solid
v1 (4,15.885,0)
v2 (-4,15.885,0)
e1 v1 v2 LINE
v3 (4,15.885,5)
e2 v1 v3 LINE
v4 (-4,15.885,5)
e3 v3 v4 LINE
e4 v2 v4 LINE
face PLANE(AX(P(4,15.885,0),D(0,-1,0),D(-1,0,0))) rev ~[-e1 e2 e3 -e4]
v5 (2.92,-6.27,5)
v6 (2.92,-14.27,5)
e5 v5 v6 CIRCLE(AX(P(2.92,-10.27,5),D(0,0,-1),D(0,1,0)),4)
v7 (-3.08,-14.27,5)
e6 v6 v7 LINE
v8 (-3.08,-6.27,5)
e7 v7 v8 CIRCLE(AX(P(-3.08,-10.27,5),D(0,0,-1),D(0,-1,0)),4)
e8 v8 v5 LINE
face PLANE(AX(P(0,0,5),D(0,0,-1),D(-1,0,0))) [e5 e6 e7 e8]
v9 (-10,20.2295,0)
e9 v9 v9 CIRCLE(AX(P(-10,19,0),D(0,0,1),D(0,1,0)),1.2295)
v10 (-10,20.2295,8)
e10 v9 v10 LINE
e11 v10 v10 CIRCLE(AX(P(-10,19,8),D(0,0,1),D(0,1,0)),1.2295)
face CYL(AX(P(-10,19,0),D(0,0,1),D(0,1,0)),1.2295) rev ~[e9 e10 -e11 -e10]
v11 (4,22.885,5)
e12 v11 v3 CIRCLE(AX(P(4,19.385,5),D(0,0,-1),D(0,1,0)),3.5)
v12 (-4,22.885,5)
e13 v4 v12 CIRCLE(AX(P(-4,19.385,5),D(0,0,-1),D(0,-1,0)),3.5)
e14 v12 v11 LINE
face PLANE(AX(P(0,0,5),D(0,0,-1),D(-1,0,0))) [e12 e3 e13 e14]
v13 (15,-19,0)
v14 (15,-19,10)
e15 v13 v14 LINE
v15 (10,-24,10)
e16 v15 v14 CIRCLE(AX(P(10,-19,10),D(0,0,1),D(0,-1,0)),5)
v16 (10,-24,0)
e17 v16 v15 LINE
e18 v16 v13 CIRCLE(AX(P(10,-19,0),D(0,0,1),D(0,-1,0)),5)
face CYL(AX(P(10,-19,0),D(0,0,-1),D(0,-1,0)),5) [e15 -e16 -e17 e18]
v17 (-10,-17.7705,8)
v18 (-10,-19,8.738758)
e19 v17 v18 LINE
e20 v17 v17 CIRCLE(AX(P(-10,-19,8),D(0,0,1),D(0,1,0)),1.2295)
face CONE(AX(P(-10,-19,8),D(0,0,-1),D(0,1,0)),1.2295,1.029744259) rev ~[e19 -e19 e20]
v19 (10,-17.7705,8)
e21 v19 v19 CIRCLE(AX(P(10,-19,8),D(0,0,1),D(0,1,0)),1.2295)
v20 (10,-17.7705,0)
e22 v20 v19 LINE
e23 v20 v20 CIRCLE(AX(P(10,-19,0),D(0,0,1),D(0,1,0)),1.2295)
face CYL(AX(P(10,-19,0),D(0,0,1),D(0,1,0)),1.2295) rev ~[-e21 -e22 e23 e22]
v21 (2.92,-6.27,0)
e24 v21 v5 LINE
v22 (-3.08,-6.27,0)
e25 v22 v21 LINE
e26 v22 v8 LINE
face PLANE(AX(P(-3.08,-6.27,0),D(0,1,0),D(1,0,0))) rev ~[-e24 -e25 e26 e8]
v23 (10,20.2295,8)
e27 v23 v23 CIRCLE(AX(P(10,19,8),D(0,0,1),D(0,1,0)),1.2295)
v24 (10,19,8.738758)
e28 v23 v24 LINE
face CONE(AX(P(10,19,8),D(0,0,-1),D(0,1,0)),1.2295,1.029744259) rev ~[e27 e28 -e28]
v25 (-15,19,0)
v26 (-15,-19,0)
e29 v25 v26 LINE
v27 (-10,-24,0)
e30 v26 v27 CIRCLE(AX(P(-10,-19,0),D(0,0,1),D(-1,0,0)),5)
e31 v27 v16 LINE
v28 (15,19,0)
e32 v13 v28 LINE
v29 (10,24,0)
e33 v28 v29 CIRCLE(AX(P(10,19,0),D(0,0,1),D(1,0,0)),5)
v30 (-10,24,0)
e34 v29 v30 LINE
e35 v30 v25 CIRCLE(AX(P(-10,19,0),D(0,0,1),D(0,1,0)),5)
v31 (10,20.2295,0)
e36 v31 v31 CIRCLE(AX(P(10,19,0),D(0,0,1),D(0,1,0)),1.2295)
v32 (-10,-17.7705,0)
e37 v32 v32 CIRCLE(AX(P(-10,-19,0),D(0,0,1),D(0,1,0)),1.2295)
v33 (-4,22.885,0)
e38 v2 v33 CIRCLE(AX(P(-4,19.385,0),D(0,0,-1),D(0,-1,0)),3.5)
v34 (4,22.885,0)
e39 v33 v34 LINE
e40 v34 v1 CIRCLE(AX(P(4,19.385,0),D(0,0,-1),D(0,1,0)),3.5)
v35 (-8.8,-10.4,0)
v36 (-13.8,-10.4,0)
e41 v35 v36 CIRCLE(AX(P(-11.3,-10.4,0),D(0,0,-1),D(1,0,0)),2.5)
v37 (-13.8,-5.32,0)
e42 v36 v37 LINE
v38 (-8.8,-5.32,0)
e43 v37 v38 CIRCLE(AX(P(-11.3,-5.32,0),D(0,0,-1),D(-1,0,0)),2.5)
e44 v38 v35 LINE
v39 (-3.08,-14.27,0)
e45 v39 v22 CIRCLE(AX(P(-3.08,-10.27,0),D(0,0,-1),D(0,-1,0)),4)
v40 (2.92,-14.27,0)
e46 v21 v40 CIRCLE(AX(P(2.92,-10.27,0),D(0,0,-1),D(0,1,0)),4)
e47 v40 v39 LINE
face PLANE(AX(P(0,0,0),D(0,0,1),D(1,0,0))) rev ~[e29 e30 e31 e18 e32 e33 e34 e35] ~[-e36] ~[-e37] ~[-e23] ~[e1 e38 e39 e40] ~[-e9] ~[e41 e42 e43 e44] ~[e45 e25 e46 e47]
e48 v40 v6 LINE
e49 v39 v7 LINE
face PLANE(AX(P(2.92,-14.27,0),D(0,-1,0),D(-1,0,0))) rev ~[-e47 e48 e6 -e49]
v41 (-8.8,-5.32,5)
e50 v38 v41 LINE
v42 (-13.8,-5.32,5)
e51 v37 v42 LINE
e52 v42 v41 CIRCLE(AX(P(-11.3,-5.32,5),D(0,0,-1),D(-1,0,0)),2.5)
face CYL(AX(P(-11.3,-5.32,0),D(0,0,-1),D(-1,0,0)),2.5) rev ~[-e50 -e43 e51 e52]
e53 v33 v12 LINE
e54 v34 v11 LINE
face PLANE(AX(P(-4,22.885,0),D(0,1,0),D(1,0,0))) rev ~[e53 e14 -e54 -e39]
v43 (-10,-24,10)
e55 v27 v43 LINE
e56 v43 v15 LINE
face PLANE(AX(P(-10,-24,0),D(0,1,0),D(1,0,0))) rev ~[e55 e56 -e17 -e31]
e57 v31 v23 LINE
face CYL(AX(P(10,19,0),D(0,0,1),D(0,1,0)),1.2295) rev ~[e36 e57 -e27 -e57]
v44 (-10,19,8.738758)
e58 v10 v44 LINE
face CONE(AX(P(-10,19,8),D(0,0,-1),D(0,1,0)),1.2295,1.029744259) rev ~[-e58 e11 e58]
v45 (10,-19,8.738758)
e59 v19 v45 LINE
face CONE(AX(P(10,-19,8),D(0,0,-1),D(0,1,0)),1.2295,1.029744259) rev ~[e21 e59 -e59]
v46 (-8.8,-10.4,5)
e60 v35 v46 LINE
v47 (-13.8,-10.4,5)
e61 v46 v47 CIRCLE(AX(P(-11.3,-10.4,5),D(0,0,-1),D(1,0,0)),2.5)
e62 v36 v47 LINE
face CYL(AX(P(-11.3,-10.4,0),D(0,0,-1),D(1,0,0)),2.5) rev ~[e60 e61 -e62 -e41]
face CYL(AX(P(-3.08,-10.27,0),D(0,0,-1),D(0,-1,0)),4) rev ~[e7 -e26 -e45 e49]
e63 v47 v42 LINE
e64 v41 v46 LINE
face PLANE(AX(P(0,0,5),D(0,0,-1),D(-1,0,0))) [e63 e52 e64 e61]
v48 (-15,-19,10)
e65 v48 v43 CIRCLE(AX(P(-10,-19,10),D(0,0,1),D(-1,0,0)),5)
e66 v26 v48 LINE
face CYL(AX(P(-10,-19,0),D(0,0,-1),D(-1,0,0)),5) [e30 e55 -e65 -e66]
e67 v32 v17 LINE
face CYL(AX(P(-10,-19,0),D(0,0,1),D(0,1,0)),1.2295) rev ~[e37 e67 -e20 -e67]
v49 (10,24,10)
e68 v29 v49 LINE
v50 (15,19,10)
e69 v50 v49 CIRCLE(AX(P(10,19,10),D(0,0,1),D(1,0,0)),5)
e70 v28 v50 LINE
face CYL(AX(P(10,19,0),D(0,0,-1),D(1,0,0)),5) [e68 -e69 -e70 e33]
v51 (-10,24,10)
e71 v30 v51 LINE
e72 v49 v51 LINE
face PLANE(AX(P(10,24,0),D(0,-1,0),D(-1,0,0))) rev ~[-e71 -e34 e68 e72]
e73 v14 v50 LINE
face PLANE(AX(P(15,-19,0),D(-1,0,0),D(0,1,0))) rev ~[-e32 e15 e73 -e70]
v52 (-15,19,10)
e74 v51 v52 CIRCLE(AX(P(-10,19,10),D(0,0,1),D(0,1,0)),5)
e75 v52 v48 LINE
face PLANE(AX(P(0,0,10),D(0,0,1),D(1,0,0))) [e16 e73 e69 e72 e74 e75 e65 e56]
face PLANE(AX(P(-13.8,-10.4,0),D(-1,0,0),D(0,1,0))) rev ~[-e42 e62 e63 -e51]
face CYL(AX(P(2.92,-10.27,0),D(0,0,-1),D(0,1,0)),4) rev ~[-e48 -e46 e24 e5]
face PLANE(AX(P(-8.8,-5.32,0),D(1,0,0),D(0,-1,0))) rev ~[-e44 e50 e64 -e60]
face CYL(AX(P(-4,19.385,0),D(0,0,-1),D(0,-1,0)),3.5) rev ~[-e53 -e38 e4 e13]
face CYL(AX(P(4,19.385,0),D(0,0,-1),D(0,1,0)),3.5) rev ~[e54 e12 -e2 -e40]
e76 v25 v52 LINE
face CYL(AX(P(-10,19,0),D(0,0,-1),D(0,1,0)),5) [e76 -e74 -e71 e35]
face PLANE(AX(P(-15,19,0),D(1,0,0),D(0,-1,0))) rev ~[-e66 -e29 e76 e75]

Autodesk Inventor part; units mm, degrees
ref_plane "YZ Plane" through (0, 0, 0) normal (1, 0, 0) x (0, 1, 0)
ref_plane "XZ Plane" through (0, 0, 0) normal (0, 1, 0) x (-1, 0, 0)
ref_plane "XY Plane" through (0, 0, 0) normal (0, 0, 1) x (1, 0, 0)
sketch "Sketch1" plane through (0, 0, 0) normal (0, 0, 1) x (1, 0, 0)
  line L0 (-15, 19) -> (-15, -19) projected
  arc A0 (-10, 24) -> (-15, 19) centre (-10, 19) ccw projected
  line L1 (10, 24) -> (-10, 24) projected
  arc A1 (15, 19) -> (10, 24) centre (10, 19) ccw projected
  line L2 (15, -19) -> (15, 19) projected
  arc A2 (10, -24) -> (15, -19) centre (10, -19) ccw projected
  line L3 (-10, -24) -> (10, -24) projected
  arc A3 (-15, -19) -> (-10, -24) centre (-10, -19) ccw projected
  point P0 (0, 0)
extrude "Extrusion1" add sketch "Sketch1" along normal blind 10
sketch "Sketch2" plane through (0, 0, 0) normal (0, 0, -1) x (-1, 0, 0)
  circle A0 centre (-10, 19) radius 1.6 projected
  circle A1 centre (-10, -19) radius 1.6 projected
  arc A2 (10, -24) -> (15, -19) centre (10, -19) ccw projected
  line L0 (15, 19) -> (15, -19) projected
  arc A3 (15, 19) -> (10, 24) centre (10, 19) ccw projected
  line L1 (-10, 24) -> (10, 24) projected
  arc A4 (-10, 24) -> (-15, 19) centre (-10, 19) ccw projected
  line L2 (-15, -19) -> (-15, 19) projected
  arc A5 (-15, -19) -> (-10, -24) centre (-10, -19) ccw projected
  line L3 (10, -24) -> (-10, -24) projected
  circle A6 centre (10, -19) radius 1.6 projected
  circle A7 centre (10, 19) radius 1.6 projected
hole "Hole1" at (10, 19, 0) at (10, -19, 0) at (-10, -19, 0) at (-10, 19, 0) direction (0, 0, 1) diameter 2.459 depth 8 tip angle 118 thread size "M3x0.5" class "6H" standard "ANSI Metric M Profile"
sketch "Sketch3" plane through (0, 0, 0) normal (0, 0, -1) x (-1, 0, 0)
  circle A0 centre (10, 19) radius 1.2295 construction
  circle A1 centre (10, -19) radius 1.2295 construction
  circle A2 centre (-10, -19) radius 1.2295 construction
  circle A3 centre (-10, 19) radius 1.2295 construction
  arc A4 (10, -24) -> (15, -19) centre (10, -19) ccw projected
  line L0 (15, 19) -> (15, -19) projected
  arc A5 (15, 19) -> (10, 24) centre (10, 19) ccw projected
  line L1 (-10, 24) -> (10, 24) projected
  arc A6 (-10, 24) -> (-15, 19) centre (-10, 19) ccw projected
  line L2 (-15, -19) -> (-15, 19) projected
  arc A7 (-15, -19) -> (-10, -24) centre (-10, -19) ccw projected
  line L3 (10, -24) -> (-10, -24) projected
  arc A8 (15, 19) -> (10, 24) centre (10, 19) ccw projected
  line L4 (-10, 24) -> (10, 24) projected
  arc A9 (-10, 24) -> (-15, 19) centre (-10, 19) ccw projected
  line L5 (-15, -19) -> (-15, 19) projected
  arc A10 (-15, -19) -> (-10, -24) centre (-10, -19) ccw projected
  line L6 (10, -24) -> (-10, -24) projected
  arc A11 (10, -24) -> (15, -19) centre (10, -19) ccw projected
  line L7 (15, 19) -> (15, -19) projected
  circle A12 centre (11.6971, -20.6971) radius 0.25 construction
  circle A13 centre (12.4, -19) radius 0.25 construction
  circle A14 centre (10, -21.4) radius 0.25 construction
  circle A15 centre (10, -19) radius 1.6 construction
  circle A16 centre (11.6971, -17.3029) radius 0.25 construction
  circle A17 centre (10, -16.6) radius 0.25 construction
  circle A18 centre (8.3029, -20.6971) radius 0.25 construction
  circle A19 centre (7.6, -19) radius 0.25 construction
  circle A20 centre (8.3029, -17.3029) radius 0.25 construction
  circle A21 centre (2.62, -11.54) radius 0.5 construction
  circle A22 centre (0.08, -11.54) radius 0.5 construction
  circle A23 centre (11.3, -10.4) radius 0.4953 construction
  circle A24 centre (12.316, -5.32) radius 0.4953 construction
  circle A25 centre (10.284, -5.32) radius 0.4953 construction
  circle A26 centre (2.62, -9) radius 0.5 construction
  circle A27 centre (0.08, -9) radius 0.5 construction
  circle A28 centre (-2.46, -11.54) radius 0.5 construction
  circle A29 centre (-8.3029, -20.6971) radius 0.25 construction
  circle A30 centre (-7.6, -19) radius 0.25 construction
  circle A31 centre (-10, -21.4) radius 0.25 construction
  circle A32 centre (-10, -19) radius 1.6 construction
  circle A33 centre (-8.3029, -17.3029) radius 0.25 construction
  circle A34 centre (-10, -16.6) radius 0.25 construction
  circle A35 centre (-11.6971, -20.6971) radius 0.25 construction
  circle A36 centre (-12.4, -19) radius 0.25 construction
  circle A37 centre (-11.6971, -17.3029) radius 0.25 construction
  circle A38 centre (-2.46, -9) radius 0.5 construction
  circle A39 centre (-13.3, -3.2) radius 0.45 construction
  circle A40 centre (-13.3, -0.2) radius 0.45 construction
  circle A41 centre (10.7, 8.9) radius 0.1 construction
  circle A42 centre (9.85, 8.9) radius 0.1 construction
  circle A43 centre (10.7, 9.7) radius 0.1 construction
  circle A44 centre (9.85, 9.7) radius 0.1 construction
  circle A45 centre (9, 8.9) radius 0.1 construction
  circle A46 centre (9, 9.7) radius 0.1 construction
  circle A47 centre (11.6971, 17.3029) radius 0.25 construction
  circle A48 centre (12.4, 19) radius 0.25 construction
  circle A49 centre (10, 16.6) radius 0.25 construction
  circle A50 centre (10, 19) radius 1.6 construction
  circle A51 centre (11.6971, 20.6971) radius 0.25 construction
  circle A52 centre (10, 21.4) radius 0.25 construction
  circle A53 centre (8.3029, 17.3029) radius 0.25 construction
  circle A54 centre (7.6, 19) radius 0.25 construction
  circle A55 centre (8.3029, 20.6971) radius 0.25 construction
  arc A56 (4.02, 16.62) -> (4.62, 16.62) centre (4.32, 16.62) ccw construction
  line L8 (4.02, 17.72) -> (4.02, 16.62) construction
  arc A57 (4.62, 17.72) -> (4.02, 17.72) centre (4.32, 17.72) ccw construction
  line L9 (4.62, 16.62) -> (4.62, 17.72) construction
  circle A58 centre (2.89, 17.7) radius 0.325 construction
  arc A59 (4.02, 21.05) -> (4.62, 21.05) centre (4.32, 21.05) ccw construction
  line L10 (4.02, 21.65) -> (4.02, 21.05) construction
  arc A60 (4.62, 21.65) -> (4.02, 21.65) centre (4.32, 21.65) ccw construction
  line L11 (4.62, 21.05) -> (4.62, 21.65) construction
  circle A61 centre (-2.89, 17.7) radius 0.325 construction
  arc A62 (-4.62, 16.62) -> (-4.02, 16.62) centre (-4.32, 16.62) ccw construction
  line L12 (-4.62, 17.72) -> (-4.62, 16.62) construction
  arc A63 (-4.02, 17.72) -> (-4.62, 17.72) centre (-4.32, 17.72) ccw construction
  line L13 (-4.02, 16.62) -> (-4.02, 17.72) construction
  arc A64 (-4.62, 21.05) -> (-4.02, 21.05) centre (-4.32, 21.05) ccw construction
  line L14 (-4.62, 21.65) -> (-4.62, 21.05) construction
  arc A65 (-4.02, 21.65) -> (-4.62, 21.65) centre (-4.32, 21.65) ccw construction
  line L15 (-4.02, 21.05) -> (-4.02, 21.65) construction
  circle A66 centre (-8.3029, 17.3029) radius 0.25 construction
  circle A67 centre (-7.6, 19) radius 0.25 construction
  circle A68 centre (-10, 16.6) radius 0.25 construction
  circle A69 centre (-10, 19) radius 1.6 construction
  circle A70 centre (-8.3029, 20.6971) radius 0.25 construction
  circle A71 centre (-10, 21.4) radius 0.25 construction
  circle A72 centre (-11.6971, 17.3029) radius 0.25 construction
  circle A73 centre (-12.4, 19) radius 0.25 construction
  circle A74 centre (-11.6971, 20.6971) radius 0.25 construction
  line L16 (11.3, -10.4) -> (11.3, -5.32) construction
  line L17 (13.8, -10.4) -> (13.8, -5.32)
  line L18 (8.8, -5.32) -> (8.8, -10.4)
  arc A75 (8.8, -10.4) -> (13.8, -10.4) centre (11.3, -10.4) ccw
  arc A76 (13.8, -5.32) -> (8.8, -5.32) centre (11.3, -5.32) ccw
  line L19 (11.3, -5.32) -> (12.316, -5.32) construction
  line L20 (-4.32, 17.72) -> (4.32, 17.72) construction
  line L21 (4.32, 21.05) -> (-4.32, 21.05) construction
  line L22 (0, 17.72) -> (0, 21.05) construction
  line L23 (-4, 19.385) -> (4, 19.385) construction
  line L24 (-4, 15.885) -> (4, 15.885)
  line L25 (4, 22.885) -> (-4, 22.885)
  arc A77 (-4, 22.885) -> (-4, 15.885) centre (-4, 19.385) ccw
  arc A78 (4, 15.885) -> (4, 22.885) centre (4, 19.385) ccw
  line L26 (-2.46, -11.54) -> (2.62, -9) construction
  line L27 (2.62, -11.54) -> (-2.46, -9) construction
  line L28 (-2.92, -10.27) -> (3.08, -10.27) construction
  line L29 (-2.92, -14.27) -> (3.08, -14.27)
  line L30 (3.08, -6.27) -> (-2.92, -6.27)
  arc A79 (-2.92, -6.27) -> (-2.92, -14.27) centre (-2.92, -10.27) ccw
  arc A80 (3.08, -14.27) -> (3.08, -6.27) centre (3.08, -10.27) ccw
  point P0 (0, 0)
  point P1 (11.3, -7.86)
  point P2 (0, 19.385)
  point P3 (0.08, -10.27)
  dimension "d10" = 5
  dimension "d16" = 4
  dimension "d17" = 7
  dimension "d18" = 3
  dimension "d19" = 8
extrude "Extrusion2" cut sketch "Sketch3" against normal blind 5 contours A75 L18 A76 L17 | A77 L25 A78 L24 | A79 L30 A80 L29
properties part number "Backplate" material "Aluminum 6061"
